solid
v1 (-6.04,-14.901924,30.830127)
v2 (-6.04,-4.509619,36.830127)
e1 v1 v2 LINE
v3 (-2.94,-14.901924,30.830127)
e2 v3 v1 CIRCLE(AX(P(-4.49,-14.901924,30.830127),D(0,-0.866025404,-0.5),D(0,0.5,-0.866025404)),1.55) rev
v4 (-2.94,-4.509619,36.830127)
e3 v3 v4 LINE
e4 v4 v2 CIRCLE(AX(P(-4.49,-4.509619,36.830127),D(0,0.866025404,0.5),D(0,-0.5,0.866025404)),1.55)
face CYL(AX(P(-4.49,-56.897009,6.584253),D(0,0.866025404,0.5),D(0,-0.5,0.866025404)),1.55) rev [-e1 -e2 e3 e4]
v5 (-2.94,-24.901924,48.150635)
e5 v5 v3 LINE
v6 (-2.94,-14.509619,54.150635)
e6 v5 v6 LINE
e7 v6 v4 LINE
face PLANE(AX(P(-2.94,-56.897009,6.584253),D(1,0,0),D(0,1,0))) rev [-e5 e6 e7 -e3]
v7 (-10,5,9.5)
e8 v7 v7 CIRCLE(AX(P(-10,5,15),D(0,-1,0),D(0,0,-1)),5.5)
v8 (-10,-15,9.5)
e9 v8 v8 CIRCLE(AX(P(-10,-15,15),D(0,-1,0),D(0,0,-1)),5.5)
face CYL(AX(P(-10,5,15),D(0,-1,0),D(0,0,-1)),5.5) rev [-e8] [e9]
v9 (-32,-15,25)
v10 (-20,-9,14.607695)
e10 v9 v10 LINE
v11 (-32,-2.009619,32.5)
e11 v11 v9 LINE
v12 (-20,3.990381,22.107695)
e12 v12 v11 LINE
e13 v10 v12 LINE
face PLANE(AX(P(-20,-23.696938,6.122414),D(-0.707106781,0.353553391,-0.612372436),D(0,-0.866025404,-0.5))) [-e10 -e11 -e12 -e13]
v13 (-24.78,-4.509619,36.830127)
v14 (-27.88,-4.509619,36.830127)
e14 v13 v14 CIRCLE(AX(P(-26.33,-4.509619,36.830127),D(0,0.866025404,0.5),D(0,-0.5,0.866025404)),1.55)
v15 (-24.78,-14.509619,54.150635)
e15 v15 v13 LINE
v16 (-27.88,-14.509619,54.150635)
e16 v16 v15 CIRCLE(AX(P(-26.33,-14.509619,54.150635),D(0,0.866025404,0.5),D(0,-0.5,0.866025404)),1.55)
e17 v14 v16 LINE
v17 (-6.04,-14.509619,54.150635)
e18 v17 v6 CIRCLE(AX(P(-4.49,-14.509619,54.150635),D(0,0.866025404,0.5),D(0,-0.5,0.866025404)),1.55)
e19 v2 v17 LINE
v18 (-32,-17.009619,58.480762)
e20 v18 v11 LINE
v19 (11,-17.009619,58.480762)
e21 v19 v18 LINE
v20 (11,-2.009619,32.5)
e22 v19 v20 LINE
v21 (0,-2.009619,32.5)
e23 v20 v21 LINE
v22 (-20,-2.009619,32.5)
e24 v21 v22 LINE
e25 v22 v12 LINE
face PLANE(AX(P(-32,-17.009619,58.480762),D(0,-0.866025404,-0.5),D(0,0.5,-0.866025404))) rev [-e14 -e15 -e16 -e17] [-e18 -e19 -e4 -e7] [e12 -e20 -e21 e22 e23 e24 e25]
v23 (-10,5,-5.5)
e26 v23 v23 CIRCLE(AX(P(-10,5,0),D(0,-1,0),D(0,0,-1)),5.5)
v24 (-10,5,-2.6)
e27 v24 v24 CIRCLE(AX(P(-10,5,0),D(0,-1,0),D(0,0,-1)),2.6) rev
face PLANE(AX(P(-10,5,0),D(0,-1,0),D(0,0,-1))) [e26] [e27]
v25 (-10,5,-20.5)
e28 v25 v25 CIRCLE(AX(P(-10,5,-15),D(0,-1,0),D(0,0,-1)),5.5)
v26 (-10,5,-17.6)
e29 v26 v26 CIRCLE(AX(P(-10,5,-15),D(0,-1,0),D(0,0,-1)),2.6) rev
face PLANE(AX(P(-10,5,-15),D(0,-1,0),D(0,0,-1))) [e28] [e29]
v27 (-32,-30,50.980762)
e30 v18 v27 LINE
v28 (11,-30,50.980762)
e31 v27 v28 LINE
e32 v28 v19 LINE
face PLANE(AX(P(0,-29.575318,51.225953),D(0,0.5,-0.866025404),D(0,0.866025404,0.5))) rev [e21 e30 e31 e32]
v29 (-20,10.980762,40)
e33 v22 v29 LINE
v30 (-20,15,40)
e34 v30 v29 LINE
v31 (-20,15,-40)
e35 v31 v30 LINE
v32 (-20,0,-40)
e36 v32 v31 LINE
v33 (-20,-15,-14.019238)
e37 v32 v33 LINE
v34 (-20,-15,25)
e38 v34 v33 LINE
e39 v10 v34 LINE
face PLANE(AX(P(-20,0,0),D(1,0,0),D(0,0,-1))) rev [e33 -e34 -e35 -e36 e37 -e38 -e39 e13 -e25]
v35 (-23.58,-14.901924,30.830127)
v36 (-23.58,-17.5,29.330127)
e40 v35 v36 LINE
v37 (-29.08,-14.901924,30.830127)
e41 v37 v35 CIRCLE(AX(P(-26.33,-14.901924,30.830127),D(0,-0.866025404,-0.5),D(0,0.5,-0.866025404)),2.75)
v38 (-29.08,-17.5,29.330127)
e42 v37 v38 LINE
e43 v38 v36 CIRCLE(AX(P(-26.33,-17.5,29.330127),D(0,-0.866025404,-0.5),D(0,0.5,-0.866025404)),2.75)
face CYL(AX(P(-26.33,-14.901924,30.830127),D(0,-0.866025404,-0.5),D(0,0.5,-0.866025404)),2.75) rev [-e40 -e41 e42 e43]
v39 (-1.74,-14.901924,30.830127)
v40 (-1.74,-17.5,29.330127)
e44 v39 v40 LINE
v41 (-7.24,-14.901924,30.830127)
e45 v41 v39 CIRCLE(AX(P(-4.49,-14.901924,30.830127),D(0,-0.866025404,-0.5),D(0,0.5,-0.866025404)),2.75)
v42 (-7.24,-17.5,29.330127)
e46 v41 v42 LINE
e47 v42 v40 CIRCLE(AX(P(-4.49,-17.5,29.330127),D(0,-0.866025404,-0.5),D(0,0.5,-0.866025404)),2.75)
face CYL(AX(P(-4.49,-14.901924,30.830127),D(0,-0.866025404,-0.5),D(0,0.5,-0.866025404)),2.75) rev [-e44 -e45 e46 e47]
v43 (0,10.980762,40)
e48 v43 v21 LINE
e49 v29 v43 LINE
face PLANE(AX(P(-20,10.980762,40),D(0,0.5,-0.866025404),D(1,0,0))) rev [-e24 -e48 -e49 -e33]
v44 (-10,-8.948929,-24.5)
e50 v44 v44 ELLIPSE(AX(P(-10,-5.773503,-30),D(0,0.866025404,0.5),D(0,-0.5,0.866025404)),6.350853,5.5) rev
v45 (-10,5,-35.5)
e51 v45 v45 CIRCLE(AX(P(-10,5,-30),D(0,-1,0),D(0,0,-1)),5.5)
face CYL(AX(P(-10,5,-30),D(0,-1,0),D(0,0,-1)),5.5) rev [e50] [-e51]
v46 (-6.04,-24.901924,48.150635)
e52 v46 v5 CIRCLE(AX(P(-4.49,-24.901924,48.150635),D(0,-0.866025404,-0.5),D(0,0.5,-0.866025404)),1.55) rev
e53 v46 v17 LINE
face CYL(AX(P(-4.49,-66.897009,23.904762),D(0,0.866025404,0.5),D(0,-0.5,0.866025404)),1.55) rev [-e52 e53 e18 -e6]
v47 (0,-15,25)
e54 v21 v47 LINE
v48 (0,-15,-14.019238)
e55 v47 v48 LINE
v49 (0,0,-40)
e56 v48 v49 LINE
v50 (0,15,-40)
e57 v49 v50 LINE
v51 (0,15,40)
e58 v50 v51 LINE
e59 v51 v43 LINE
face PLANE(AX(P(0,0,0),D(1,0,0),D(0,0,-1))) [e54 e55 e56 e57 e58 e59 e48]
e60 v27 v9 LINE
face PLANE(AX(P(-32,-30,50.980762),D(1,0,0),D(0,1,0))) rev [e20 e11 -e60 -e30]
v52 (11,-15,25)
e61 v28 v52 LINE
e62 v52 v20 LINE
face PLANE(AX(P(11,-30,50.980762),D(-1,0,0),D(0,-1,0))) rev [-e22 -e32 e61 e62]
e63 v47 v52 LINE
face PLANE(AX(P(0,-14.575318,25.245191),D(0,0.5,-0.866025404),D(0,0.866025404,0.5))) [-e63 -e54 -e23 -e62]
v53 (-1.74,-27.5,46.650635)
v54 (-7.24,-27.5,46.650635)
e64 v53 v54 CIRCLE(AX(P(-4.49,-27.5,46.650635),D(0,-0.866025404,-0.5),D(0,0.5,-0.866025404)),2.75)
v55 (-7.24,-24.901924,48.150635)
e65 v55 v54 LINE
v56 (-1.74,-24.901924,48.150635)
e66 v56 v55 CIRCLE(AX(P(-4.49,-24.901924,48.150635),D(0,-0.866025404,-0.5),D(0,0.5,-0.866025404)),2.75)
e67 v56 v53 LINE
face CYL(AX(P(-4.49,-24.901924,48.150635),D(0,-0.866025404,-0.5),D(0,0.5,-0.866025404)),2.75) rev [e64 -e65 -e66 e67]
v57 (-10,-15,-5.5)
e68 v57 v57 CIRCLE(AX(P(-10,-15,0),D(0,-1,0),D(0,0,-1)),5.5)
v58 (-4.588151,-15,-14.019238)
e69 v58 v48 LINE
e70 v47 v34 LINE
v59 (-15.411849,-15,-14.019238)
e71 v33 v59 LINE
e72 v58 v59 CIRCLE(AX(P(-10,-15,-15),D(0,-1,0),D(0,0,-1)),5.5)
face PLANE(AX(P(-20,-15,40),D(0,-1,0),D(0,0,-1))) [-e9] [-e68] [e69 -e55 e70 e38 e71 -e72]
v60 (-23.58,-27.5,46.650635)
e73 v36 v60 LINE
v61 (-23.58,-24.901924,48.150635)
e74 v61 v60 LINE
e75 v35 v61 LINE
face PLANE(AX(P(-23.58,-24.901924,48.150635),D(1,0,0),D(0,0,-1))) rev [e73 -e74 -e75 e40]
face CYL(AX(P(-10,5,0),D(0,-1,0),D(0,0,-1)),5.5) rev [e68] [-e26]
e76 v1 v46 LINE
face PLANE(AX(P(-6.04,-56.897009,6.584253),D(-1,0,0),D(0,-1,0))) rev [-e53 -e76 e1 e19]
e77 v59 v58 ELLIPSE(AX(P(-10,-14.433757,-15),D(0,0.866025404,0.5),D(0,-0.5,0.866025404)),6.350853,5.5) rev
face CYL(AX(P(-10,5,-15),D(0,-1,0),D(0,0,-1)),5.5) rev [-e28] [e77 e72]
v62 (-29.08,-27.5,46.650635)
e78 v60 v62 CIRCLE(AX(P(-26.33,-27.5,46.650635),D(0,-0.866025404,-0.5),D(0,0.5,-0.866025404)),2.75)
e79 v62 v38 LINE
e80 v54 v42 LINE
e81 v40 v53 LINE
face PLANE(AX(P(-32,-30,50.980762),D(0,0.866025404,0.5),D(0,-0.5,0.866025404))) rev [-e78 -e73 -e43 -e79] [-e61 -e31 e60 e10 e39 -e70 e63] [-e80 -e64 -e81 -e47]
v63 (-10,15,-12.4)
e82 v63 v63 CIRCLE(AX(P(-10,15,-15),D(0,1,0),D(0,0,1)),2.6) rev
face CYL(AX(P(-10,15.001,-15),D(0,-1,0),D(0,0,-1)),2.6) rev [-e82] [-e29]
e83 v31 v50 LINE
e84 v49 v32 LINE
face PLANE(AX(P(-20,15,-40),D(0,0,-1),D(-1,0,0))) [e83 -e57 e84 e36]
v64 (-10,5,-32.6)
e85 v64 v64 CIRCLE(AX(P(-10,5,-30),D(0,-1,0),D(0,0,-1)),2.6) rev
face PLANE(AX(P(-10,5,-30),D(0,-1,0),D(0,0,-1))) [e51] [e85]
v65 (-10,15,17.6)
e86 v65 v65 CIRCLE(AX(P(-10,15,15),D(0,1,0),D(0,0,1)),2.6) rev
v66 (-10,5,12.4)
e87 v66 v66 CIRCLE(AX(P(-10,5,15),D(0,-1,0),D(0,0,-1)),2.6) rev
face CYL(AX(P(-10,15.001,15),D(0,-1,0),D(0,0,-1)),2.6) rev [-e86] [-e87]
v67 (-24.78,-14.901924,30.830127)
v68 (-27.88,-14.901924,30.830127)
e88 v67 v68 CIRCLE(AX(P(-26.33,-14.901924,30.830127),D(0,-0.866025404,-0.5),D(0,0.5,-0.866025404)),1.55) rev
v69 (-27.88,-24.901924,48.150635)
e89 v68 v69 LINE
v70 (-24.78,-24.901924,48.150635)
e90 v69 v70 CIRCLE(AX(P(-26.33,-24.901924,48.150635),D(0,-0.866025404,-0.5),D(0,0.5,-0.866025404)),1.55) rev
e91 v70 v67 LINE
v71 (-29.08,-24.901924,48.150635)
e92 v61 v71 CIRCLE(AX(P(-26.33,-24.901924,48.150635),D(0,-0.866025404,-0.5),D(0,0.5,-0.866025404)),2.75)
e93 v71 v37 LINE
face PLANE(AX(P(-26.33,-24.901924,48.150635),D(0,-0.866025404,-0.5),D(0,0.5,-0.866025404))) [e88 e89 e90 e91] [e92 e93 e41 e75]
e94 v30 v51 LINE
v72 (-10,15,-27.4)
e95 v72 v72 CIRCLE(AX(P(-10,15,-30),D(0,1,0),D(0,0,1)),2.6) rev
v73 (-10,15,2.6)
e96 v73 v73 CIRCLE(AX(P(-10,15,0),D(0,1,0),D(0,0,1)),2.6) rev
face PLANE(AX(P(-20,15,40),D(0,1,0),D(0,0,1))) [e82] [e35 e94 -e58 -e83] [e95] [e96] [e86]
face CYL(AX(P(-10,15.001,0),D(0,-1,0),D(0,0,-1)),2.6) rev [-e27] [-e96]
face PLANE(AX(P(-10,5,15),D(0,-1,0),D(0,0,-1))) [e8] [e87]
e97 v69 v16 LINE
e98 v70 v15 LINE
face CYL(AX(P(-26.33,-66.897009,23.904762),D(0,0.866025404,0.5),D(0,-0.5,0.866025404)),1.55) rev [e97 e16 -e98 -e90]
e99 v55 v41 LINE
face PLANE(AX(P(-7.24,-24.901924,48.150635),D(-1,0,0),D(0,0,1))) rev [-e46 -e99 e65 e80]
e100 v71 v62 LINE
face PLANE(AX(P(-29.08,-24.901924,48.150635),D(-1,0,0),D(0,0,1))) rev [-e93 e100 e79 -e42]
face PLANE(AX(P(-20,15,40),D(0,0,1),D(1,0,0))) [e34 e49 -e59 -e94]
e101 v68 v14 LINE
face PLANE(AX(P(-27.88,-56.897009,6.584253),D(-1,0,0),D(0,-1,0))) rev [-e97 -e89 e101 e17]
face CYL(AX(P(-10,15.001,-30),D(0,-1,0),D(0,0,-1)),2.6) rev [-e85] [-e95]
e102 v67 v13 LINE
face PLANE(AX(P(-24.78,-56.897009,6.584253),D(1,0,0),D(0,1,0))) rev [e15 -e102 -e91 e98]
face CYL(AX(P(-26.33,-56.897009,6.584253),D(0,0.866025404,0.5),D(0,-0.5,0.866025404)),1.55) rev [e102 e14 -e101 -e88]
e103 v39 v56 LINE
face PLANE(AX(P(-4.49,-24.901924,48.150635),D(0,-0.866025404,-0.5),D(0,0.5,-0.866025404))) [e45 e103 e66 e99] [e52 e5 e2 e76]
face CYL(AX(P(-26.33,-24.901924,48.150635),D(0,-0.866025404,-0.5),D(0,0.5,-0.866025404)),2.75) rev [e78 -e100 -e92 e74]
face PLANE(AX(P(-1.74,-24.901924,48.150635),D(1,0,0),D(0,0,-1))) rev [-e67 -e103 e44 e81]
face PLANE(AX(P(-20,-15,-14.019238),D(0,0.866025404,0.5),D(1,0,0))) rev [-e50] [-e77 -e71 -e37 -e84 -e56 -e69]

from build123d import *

# Parameters (mm, degrees)
SKETCH1_W           = 80
SKETCH1_H           = 30
BOSS_EXTRUDE1_DEPTH = 20
CHAMFER1_SIZE       = 15
CHAMFER1_SIZE2      = 25.980762114
SKETCH2_W           = 43
SKETCH2_H           = 15
BOSS_EXTRUDE2_DEPTH = 30
CUT_EXTRUDE1_REACH  = 75.891
CUT_EXTRUDE2_DEPTH  = 3
SKETCH5_W           = 12
SKETCH5_H           = 12
BOSS_EXTRUDE3_DEPTH = 15
CHAMFER2_SIZE       = 12
CUT_EXTRUDE3_REACH  = 75.103
SKETCH6_R           = 2.6
SKETCH7_R           = 5.5
CUT_EXTRUDE4_DEPTH  = 20
CHAMFER3_SIZE       = 15
CHAMFER3_SIZE_2     = 25.980762114


# Some blends are built 0.0001 mm under size
with BuildPart() as part:
    # Sketch1 → Boss-Extrude1 (new body)
    with BuildSketch(Plane(origin=(0, 0, 0), x_dir=(0, 0, -1), z_dir=(1, 0, 0))):
        Rectangle(SKETCH1_W, SKETCH1_H)
    extrude(amount=-BOSS_EXTRUDE1_DEPTH)

    # Chamfer1
    chamfer1_edges = [part.edges().sort_by_distance(p)[0] for p in [
        (-10, -15, 40),
    ]]
    chamfer1_side = [part.faces().sort_by_distance(p)[0] for p in [
        (-10, -15, 0),
    ]]
    chamfer(chamfer1_edges, length=CHAMFER1_SIZE, length2=CHAMFER1_SIZE2, reference=chamfer1_side[0])

    # Sketch2 → Boss-Extrude2 (add)
    with BuildSketch(Plane(origin=(0, -14.575317547, 25.245190528), x_dir=(1, 0, 0), z_dir=(0, -0.5000000000000012, 0.866025403784438))):
        with Locations((-10.5, 7.009618943)):
            Rectangle(SKETCH2_W, SKETCH2_H)
    extrude(amount=BOSS_EXTRUDE2_DEPTH)

    # Sketch3 → Cut-Extrude1 (cut, up to next)
    with BuildSketch(Plane(origin=(0, 12.565698604, 7.254809472), x_dir=(1, 0, 0), z_dir=(0, 0.8660254037844378, 0.5000000000000013)), mode=Mode.PRIVATE) as cut_extrude1_sk1:
        with BuildLine():
            Line((-24.78, -34.150635095), (-24.78, -54.150635095))
            ThreePointArc((-24.78, -54.150635095), (-26.33, -55.700635095), (-27.88, -54.150635095))
            Line((-27.88, -54.150635095), (-27.88, -34.150635095))
            ThreePointArc((-27.88, -34.150635095), (-26.33, -32.600635095), (-24.78, -34.150635095))
        make_face()
    cut_extrude1_tool1 = extrude(cut_extrude1_sk1.sketch, amount=-CUT_EXTRUDE1_REACH, mode=Mode.PRIVATE) & part.part
    # Sketch3 → Cut-Extrude1 (cut, up to next)
    with BuildSketch(Plane(origin=(0, 12.565698604, 7.254809472), x_dir=(1, 0, 0), z_dir=(0, 0.8660254037844378, 0.5000000000000013)), mode=Mode.PRIVATE) as cut_extrude1_sk2:
        with BuildLine():
            Line((-2.94, -34.150635095), (-2.94, -54.150635095))
            ThreePointArc((-2.94, -54.150635095), (-4.49, -55.700635095), (-6.04, -54.150635095))
            Line((-6.04, -54.150635095), (-6.04, -34.150635095))
            ThreePointArc((-6.04, -34.150635095), (-4.49, -32.600635095), (-2.94, -34.150635095))
        make_face()
    cut_extrude1_tool2 = extrude(cut_extrude1_sk2.sketch, amount=-CUT_EXTRUDE1_REACH, mode=Mode.PRIVATE) & part.part
    add(cut_extrude1_tool1.solids().sort_by_distance((-26.33, -9.509619, 45.490381))[0], mode=Mode.SUBTRACT)
    add(cut_extrude1_tool2.solids().sort_by_distance((-4.49, -9.509619, 45.490381))[0], mode=Mode.SUBTRACT)

    # Sketch4 → Cut-Extrude2 (cut)
    with BuildSketch(Plane(origin=(0, -0.424682453, -0.245190528), x_dir=(1, 0, 0), z_dir=(0, -0.8660254037844379, -0.5000000000000013))):
        with BuildLine():
            Line((-23.58, 54.150635095), (-23.58, 34.150635095))
            ThreePointArc((-23.58, 34.150635095), (-26.33, 31.400635095), (-29.08, 34.150635095))
            Line((-29.08, 34.150635095), (-29.08, 54.150635095))
            ThreePointArc((-29.08, 54.150635095), (-26.33, 56.900635095), (-23.58, 54.150635095))
        make_face()
        with BuildLine():
            Line((-1.74, 54.150635095), (-1.74, 34.150635095))
            ThreePointArc((-1.74, 34.150635095), (-4.49, 31.400635095), (-7.24, 34.150635095))
            Line((-7.24, 34.150635095), (-7.24, 54.150635095))
            ThreePointArc((-7.24, 54.150635095), (-4.49, 56.900635095), (-1.74, 54.150635095))
        make_face()
    extrude(amount=-CUT_EXTRUDE2_DEPTH, mode=Mode.SUBTRACT)

    # Sketch5 → Boss-Extrude3 (add)
    with BuildSketch(Plane(origin=(0, 12.565698604, 7.254809472), x_dir=(1, 0, 0), z_dir=(0, 0.8660254037844378, 0.5000000000000013))):
        with Locations((-26, -23.150635095)):
            Rectangle(SKETCH5_W, SKETCH5_H)
    extrude(amount=-BOSS_EXTRUDE3_DEPTH)

    # Chamfer2
    chamfer2_edges = [part.edges().sort_by_distance(p)[0] for p in [
        (-32, -2.504809472, 18.357695155),
    ]]
    chamfer(chamfer2_edges, length=CHAMFER2_SIZE - 0.0001)  # a hair under: the kernel refuses the full size

    # Sketch6 → Cut-Extrude3 (cut, up to next)
    with BuildSketch(Plane.XZ.offset(15), mode=Mode.PRIVATE) as cut_extrude3_sk1:
        with Locations(Location((-10, -30, 0), (0, 0, 270))):
            Circle(SKETCH6_R)
    cut_extrude3_tool1 = extrude(cut_extrude3_sk1.sketch, amount=-CUT_EXTRUDE3_REACH, mode=Mode.PRIVATE) & part.part
    # Sketch6 → Cut-Extrude3 (cut, up to next)
    with BuildSketch(Plane.XZ.offset(15), mode=Mode.PRIVATE) as cut_extrude3_sk2:
        with Locations(Location((-10, -15, 0), (0, 0, 270))):
            Circle(SKETCH6_R)
    cut_extrude3_tool2 = extrude(cut_extrude3_sk2.sketch, amount=-CUT_EXTRUDE3_REACH, mode=Mode.PRIVATE) & part.part
    # Sketch6 → Cut-Extrude3 (cut, up to next)
    with BuildSketch(Plane.XZ.offset(15), mode=Mode.PRIVATE) as cut_extrude3_sk3:
        with Locations(Location((-10, 0, 0), (0, 0, 270))):
            Circle(SKETCH6_R)
    cut_extrude3_tool3 = extrude(cut_extrude3_sk3.sketch, amount=-CUT_EXTRUDE3_REACH, mode=Mode.PRIVATE) & part.part
    # Sketch6 → Cut-Extrude3 (cut, up to next)
    with BuildSketch(Plane.XZ.offset(15), mode=Mode.PRIVATE) as cut_extrude3_sk4:
        with Locations(Location((-10, 15, 0), (0, 0, 270))):
            Circle(SKETCH6_R)
    cut_extrude3_tool4 = extrude(cut_extrude3_sk4.sketch, amount=-CUT_EXTRUDE3_REACH, mode=Mode.PRIVATE) & part.part
    add(cut_extrude3_tool1.solids().sort_by_distance((-10, -15, -30))[0], mode=Mode.SUBTRACT)
    add(cut_extrude3_tool2.solids().sort_by_distance((-10, -15, -15))[0], mode=Mode.SUBTRACT)
    add(cut_extrude3_tool3.solids().sort_by_distance((-10, -15, 0))[0], mode=Mode.SUBTRACT)
    add(cut_extrude3_tool4.solids().sort_by_distance((-10, -15, 15))[0], mode=Mode.SUBTRACT)

    # Sketch7 → Cut-Extrude4 (cut)
    with BuildSketch(Plane.XZ.offset(15)):
        with Locations(Location((-10, 15, 0), (0, 0, 270))):
            Circle(SKETCH7_R)
        with Locations(Location((-10, 0, 0), (0, 0, 270))):
            Circle(SKETCH7_R)
        with Locations(Location((-10, -15, 0), (0, 0, 270))):
            Circle(SKETCH7_R)
        with Locations(Location((-10, -30, 0), (0, 0, 270))):
            Circle(SKETCH7_R)
    extrude(amount=-CUT_EXTRUDE4_DEPTH, mode=Mode.SUBTRACT)

    # Chamfer3
    # the kernel refuses this chamfer: 25.980762114, 15 mm, written as the material it takes off along each edge
    with BuildSketch(Plane(origin=(67.214459559, -15, -40), x_dir=(0, 0.9983227437537926, -0.057893862402671366), z_dir=(-1, 0, 0))) as chamfer3_piece_1:
        Polygon((CHAMFER3_SIZE * 0.998322743754, -CHAMFER3_SIZE * 0.0578938624027), (-CHAMFER3_SIZE_2 * 0.0578938624016, -CHAMFER3_SIZE_2 * 0.998322743736), (0, 0), align=None)
    extrude(amount=154.428919118, mode=Mode.SUBTRACT)


solid = part.part
